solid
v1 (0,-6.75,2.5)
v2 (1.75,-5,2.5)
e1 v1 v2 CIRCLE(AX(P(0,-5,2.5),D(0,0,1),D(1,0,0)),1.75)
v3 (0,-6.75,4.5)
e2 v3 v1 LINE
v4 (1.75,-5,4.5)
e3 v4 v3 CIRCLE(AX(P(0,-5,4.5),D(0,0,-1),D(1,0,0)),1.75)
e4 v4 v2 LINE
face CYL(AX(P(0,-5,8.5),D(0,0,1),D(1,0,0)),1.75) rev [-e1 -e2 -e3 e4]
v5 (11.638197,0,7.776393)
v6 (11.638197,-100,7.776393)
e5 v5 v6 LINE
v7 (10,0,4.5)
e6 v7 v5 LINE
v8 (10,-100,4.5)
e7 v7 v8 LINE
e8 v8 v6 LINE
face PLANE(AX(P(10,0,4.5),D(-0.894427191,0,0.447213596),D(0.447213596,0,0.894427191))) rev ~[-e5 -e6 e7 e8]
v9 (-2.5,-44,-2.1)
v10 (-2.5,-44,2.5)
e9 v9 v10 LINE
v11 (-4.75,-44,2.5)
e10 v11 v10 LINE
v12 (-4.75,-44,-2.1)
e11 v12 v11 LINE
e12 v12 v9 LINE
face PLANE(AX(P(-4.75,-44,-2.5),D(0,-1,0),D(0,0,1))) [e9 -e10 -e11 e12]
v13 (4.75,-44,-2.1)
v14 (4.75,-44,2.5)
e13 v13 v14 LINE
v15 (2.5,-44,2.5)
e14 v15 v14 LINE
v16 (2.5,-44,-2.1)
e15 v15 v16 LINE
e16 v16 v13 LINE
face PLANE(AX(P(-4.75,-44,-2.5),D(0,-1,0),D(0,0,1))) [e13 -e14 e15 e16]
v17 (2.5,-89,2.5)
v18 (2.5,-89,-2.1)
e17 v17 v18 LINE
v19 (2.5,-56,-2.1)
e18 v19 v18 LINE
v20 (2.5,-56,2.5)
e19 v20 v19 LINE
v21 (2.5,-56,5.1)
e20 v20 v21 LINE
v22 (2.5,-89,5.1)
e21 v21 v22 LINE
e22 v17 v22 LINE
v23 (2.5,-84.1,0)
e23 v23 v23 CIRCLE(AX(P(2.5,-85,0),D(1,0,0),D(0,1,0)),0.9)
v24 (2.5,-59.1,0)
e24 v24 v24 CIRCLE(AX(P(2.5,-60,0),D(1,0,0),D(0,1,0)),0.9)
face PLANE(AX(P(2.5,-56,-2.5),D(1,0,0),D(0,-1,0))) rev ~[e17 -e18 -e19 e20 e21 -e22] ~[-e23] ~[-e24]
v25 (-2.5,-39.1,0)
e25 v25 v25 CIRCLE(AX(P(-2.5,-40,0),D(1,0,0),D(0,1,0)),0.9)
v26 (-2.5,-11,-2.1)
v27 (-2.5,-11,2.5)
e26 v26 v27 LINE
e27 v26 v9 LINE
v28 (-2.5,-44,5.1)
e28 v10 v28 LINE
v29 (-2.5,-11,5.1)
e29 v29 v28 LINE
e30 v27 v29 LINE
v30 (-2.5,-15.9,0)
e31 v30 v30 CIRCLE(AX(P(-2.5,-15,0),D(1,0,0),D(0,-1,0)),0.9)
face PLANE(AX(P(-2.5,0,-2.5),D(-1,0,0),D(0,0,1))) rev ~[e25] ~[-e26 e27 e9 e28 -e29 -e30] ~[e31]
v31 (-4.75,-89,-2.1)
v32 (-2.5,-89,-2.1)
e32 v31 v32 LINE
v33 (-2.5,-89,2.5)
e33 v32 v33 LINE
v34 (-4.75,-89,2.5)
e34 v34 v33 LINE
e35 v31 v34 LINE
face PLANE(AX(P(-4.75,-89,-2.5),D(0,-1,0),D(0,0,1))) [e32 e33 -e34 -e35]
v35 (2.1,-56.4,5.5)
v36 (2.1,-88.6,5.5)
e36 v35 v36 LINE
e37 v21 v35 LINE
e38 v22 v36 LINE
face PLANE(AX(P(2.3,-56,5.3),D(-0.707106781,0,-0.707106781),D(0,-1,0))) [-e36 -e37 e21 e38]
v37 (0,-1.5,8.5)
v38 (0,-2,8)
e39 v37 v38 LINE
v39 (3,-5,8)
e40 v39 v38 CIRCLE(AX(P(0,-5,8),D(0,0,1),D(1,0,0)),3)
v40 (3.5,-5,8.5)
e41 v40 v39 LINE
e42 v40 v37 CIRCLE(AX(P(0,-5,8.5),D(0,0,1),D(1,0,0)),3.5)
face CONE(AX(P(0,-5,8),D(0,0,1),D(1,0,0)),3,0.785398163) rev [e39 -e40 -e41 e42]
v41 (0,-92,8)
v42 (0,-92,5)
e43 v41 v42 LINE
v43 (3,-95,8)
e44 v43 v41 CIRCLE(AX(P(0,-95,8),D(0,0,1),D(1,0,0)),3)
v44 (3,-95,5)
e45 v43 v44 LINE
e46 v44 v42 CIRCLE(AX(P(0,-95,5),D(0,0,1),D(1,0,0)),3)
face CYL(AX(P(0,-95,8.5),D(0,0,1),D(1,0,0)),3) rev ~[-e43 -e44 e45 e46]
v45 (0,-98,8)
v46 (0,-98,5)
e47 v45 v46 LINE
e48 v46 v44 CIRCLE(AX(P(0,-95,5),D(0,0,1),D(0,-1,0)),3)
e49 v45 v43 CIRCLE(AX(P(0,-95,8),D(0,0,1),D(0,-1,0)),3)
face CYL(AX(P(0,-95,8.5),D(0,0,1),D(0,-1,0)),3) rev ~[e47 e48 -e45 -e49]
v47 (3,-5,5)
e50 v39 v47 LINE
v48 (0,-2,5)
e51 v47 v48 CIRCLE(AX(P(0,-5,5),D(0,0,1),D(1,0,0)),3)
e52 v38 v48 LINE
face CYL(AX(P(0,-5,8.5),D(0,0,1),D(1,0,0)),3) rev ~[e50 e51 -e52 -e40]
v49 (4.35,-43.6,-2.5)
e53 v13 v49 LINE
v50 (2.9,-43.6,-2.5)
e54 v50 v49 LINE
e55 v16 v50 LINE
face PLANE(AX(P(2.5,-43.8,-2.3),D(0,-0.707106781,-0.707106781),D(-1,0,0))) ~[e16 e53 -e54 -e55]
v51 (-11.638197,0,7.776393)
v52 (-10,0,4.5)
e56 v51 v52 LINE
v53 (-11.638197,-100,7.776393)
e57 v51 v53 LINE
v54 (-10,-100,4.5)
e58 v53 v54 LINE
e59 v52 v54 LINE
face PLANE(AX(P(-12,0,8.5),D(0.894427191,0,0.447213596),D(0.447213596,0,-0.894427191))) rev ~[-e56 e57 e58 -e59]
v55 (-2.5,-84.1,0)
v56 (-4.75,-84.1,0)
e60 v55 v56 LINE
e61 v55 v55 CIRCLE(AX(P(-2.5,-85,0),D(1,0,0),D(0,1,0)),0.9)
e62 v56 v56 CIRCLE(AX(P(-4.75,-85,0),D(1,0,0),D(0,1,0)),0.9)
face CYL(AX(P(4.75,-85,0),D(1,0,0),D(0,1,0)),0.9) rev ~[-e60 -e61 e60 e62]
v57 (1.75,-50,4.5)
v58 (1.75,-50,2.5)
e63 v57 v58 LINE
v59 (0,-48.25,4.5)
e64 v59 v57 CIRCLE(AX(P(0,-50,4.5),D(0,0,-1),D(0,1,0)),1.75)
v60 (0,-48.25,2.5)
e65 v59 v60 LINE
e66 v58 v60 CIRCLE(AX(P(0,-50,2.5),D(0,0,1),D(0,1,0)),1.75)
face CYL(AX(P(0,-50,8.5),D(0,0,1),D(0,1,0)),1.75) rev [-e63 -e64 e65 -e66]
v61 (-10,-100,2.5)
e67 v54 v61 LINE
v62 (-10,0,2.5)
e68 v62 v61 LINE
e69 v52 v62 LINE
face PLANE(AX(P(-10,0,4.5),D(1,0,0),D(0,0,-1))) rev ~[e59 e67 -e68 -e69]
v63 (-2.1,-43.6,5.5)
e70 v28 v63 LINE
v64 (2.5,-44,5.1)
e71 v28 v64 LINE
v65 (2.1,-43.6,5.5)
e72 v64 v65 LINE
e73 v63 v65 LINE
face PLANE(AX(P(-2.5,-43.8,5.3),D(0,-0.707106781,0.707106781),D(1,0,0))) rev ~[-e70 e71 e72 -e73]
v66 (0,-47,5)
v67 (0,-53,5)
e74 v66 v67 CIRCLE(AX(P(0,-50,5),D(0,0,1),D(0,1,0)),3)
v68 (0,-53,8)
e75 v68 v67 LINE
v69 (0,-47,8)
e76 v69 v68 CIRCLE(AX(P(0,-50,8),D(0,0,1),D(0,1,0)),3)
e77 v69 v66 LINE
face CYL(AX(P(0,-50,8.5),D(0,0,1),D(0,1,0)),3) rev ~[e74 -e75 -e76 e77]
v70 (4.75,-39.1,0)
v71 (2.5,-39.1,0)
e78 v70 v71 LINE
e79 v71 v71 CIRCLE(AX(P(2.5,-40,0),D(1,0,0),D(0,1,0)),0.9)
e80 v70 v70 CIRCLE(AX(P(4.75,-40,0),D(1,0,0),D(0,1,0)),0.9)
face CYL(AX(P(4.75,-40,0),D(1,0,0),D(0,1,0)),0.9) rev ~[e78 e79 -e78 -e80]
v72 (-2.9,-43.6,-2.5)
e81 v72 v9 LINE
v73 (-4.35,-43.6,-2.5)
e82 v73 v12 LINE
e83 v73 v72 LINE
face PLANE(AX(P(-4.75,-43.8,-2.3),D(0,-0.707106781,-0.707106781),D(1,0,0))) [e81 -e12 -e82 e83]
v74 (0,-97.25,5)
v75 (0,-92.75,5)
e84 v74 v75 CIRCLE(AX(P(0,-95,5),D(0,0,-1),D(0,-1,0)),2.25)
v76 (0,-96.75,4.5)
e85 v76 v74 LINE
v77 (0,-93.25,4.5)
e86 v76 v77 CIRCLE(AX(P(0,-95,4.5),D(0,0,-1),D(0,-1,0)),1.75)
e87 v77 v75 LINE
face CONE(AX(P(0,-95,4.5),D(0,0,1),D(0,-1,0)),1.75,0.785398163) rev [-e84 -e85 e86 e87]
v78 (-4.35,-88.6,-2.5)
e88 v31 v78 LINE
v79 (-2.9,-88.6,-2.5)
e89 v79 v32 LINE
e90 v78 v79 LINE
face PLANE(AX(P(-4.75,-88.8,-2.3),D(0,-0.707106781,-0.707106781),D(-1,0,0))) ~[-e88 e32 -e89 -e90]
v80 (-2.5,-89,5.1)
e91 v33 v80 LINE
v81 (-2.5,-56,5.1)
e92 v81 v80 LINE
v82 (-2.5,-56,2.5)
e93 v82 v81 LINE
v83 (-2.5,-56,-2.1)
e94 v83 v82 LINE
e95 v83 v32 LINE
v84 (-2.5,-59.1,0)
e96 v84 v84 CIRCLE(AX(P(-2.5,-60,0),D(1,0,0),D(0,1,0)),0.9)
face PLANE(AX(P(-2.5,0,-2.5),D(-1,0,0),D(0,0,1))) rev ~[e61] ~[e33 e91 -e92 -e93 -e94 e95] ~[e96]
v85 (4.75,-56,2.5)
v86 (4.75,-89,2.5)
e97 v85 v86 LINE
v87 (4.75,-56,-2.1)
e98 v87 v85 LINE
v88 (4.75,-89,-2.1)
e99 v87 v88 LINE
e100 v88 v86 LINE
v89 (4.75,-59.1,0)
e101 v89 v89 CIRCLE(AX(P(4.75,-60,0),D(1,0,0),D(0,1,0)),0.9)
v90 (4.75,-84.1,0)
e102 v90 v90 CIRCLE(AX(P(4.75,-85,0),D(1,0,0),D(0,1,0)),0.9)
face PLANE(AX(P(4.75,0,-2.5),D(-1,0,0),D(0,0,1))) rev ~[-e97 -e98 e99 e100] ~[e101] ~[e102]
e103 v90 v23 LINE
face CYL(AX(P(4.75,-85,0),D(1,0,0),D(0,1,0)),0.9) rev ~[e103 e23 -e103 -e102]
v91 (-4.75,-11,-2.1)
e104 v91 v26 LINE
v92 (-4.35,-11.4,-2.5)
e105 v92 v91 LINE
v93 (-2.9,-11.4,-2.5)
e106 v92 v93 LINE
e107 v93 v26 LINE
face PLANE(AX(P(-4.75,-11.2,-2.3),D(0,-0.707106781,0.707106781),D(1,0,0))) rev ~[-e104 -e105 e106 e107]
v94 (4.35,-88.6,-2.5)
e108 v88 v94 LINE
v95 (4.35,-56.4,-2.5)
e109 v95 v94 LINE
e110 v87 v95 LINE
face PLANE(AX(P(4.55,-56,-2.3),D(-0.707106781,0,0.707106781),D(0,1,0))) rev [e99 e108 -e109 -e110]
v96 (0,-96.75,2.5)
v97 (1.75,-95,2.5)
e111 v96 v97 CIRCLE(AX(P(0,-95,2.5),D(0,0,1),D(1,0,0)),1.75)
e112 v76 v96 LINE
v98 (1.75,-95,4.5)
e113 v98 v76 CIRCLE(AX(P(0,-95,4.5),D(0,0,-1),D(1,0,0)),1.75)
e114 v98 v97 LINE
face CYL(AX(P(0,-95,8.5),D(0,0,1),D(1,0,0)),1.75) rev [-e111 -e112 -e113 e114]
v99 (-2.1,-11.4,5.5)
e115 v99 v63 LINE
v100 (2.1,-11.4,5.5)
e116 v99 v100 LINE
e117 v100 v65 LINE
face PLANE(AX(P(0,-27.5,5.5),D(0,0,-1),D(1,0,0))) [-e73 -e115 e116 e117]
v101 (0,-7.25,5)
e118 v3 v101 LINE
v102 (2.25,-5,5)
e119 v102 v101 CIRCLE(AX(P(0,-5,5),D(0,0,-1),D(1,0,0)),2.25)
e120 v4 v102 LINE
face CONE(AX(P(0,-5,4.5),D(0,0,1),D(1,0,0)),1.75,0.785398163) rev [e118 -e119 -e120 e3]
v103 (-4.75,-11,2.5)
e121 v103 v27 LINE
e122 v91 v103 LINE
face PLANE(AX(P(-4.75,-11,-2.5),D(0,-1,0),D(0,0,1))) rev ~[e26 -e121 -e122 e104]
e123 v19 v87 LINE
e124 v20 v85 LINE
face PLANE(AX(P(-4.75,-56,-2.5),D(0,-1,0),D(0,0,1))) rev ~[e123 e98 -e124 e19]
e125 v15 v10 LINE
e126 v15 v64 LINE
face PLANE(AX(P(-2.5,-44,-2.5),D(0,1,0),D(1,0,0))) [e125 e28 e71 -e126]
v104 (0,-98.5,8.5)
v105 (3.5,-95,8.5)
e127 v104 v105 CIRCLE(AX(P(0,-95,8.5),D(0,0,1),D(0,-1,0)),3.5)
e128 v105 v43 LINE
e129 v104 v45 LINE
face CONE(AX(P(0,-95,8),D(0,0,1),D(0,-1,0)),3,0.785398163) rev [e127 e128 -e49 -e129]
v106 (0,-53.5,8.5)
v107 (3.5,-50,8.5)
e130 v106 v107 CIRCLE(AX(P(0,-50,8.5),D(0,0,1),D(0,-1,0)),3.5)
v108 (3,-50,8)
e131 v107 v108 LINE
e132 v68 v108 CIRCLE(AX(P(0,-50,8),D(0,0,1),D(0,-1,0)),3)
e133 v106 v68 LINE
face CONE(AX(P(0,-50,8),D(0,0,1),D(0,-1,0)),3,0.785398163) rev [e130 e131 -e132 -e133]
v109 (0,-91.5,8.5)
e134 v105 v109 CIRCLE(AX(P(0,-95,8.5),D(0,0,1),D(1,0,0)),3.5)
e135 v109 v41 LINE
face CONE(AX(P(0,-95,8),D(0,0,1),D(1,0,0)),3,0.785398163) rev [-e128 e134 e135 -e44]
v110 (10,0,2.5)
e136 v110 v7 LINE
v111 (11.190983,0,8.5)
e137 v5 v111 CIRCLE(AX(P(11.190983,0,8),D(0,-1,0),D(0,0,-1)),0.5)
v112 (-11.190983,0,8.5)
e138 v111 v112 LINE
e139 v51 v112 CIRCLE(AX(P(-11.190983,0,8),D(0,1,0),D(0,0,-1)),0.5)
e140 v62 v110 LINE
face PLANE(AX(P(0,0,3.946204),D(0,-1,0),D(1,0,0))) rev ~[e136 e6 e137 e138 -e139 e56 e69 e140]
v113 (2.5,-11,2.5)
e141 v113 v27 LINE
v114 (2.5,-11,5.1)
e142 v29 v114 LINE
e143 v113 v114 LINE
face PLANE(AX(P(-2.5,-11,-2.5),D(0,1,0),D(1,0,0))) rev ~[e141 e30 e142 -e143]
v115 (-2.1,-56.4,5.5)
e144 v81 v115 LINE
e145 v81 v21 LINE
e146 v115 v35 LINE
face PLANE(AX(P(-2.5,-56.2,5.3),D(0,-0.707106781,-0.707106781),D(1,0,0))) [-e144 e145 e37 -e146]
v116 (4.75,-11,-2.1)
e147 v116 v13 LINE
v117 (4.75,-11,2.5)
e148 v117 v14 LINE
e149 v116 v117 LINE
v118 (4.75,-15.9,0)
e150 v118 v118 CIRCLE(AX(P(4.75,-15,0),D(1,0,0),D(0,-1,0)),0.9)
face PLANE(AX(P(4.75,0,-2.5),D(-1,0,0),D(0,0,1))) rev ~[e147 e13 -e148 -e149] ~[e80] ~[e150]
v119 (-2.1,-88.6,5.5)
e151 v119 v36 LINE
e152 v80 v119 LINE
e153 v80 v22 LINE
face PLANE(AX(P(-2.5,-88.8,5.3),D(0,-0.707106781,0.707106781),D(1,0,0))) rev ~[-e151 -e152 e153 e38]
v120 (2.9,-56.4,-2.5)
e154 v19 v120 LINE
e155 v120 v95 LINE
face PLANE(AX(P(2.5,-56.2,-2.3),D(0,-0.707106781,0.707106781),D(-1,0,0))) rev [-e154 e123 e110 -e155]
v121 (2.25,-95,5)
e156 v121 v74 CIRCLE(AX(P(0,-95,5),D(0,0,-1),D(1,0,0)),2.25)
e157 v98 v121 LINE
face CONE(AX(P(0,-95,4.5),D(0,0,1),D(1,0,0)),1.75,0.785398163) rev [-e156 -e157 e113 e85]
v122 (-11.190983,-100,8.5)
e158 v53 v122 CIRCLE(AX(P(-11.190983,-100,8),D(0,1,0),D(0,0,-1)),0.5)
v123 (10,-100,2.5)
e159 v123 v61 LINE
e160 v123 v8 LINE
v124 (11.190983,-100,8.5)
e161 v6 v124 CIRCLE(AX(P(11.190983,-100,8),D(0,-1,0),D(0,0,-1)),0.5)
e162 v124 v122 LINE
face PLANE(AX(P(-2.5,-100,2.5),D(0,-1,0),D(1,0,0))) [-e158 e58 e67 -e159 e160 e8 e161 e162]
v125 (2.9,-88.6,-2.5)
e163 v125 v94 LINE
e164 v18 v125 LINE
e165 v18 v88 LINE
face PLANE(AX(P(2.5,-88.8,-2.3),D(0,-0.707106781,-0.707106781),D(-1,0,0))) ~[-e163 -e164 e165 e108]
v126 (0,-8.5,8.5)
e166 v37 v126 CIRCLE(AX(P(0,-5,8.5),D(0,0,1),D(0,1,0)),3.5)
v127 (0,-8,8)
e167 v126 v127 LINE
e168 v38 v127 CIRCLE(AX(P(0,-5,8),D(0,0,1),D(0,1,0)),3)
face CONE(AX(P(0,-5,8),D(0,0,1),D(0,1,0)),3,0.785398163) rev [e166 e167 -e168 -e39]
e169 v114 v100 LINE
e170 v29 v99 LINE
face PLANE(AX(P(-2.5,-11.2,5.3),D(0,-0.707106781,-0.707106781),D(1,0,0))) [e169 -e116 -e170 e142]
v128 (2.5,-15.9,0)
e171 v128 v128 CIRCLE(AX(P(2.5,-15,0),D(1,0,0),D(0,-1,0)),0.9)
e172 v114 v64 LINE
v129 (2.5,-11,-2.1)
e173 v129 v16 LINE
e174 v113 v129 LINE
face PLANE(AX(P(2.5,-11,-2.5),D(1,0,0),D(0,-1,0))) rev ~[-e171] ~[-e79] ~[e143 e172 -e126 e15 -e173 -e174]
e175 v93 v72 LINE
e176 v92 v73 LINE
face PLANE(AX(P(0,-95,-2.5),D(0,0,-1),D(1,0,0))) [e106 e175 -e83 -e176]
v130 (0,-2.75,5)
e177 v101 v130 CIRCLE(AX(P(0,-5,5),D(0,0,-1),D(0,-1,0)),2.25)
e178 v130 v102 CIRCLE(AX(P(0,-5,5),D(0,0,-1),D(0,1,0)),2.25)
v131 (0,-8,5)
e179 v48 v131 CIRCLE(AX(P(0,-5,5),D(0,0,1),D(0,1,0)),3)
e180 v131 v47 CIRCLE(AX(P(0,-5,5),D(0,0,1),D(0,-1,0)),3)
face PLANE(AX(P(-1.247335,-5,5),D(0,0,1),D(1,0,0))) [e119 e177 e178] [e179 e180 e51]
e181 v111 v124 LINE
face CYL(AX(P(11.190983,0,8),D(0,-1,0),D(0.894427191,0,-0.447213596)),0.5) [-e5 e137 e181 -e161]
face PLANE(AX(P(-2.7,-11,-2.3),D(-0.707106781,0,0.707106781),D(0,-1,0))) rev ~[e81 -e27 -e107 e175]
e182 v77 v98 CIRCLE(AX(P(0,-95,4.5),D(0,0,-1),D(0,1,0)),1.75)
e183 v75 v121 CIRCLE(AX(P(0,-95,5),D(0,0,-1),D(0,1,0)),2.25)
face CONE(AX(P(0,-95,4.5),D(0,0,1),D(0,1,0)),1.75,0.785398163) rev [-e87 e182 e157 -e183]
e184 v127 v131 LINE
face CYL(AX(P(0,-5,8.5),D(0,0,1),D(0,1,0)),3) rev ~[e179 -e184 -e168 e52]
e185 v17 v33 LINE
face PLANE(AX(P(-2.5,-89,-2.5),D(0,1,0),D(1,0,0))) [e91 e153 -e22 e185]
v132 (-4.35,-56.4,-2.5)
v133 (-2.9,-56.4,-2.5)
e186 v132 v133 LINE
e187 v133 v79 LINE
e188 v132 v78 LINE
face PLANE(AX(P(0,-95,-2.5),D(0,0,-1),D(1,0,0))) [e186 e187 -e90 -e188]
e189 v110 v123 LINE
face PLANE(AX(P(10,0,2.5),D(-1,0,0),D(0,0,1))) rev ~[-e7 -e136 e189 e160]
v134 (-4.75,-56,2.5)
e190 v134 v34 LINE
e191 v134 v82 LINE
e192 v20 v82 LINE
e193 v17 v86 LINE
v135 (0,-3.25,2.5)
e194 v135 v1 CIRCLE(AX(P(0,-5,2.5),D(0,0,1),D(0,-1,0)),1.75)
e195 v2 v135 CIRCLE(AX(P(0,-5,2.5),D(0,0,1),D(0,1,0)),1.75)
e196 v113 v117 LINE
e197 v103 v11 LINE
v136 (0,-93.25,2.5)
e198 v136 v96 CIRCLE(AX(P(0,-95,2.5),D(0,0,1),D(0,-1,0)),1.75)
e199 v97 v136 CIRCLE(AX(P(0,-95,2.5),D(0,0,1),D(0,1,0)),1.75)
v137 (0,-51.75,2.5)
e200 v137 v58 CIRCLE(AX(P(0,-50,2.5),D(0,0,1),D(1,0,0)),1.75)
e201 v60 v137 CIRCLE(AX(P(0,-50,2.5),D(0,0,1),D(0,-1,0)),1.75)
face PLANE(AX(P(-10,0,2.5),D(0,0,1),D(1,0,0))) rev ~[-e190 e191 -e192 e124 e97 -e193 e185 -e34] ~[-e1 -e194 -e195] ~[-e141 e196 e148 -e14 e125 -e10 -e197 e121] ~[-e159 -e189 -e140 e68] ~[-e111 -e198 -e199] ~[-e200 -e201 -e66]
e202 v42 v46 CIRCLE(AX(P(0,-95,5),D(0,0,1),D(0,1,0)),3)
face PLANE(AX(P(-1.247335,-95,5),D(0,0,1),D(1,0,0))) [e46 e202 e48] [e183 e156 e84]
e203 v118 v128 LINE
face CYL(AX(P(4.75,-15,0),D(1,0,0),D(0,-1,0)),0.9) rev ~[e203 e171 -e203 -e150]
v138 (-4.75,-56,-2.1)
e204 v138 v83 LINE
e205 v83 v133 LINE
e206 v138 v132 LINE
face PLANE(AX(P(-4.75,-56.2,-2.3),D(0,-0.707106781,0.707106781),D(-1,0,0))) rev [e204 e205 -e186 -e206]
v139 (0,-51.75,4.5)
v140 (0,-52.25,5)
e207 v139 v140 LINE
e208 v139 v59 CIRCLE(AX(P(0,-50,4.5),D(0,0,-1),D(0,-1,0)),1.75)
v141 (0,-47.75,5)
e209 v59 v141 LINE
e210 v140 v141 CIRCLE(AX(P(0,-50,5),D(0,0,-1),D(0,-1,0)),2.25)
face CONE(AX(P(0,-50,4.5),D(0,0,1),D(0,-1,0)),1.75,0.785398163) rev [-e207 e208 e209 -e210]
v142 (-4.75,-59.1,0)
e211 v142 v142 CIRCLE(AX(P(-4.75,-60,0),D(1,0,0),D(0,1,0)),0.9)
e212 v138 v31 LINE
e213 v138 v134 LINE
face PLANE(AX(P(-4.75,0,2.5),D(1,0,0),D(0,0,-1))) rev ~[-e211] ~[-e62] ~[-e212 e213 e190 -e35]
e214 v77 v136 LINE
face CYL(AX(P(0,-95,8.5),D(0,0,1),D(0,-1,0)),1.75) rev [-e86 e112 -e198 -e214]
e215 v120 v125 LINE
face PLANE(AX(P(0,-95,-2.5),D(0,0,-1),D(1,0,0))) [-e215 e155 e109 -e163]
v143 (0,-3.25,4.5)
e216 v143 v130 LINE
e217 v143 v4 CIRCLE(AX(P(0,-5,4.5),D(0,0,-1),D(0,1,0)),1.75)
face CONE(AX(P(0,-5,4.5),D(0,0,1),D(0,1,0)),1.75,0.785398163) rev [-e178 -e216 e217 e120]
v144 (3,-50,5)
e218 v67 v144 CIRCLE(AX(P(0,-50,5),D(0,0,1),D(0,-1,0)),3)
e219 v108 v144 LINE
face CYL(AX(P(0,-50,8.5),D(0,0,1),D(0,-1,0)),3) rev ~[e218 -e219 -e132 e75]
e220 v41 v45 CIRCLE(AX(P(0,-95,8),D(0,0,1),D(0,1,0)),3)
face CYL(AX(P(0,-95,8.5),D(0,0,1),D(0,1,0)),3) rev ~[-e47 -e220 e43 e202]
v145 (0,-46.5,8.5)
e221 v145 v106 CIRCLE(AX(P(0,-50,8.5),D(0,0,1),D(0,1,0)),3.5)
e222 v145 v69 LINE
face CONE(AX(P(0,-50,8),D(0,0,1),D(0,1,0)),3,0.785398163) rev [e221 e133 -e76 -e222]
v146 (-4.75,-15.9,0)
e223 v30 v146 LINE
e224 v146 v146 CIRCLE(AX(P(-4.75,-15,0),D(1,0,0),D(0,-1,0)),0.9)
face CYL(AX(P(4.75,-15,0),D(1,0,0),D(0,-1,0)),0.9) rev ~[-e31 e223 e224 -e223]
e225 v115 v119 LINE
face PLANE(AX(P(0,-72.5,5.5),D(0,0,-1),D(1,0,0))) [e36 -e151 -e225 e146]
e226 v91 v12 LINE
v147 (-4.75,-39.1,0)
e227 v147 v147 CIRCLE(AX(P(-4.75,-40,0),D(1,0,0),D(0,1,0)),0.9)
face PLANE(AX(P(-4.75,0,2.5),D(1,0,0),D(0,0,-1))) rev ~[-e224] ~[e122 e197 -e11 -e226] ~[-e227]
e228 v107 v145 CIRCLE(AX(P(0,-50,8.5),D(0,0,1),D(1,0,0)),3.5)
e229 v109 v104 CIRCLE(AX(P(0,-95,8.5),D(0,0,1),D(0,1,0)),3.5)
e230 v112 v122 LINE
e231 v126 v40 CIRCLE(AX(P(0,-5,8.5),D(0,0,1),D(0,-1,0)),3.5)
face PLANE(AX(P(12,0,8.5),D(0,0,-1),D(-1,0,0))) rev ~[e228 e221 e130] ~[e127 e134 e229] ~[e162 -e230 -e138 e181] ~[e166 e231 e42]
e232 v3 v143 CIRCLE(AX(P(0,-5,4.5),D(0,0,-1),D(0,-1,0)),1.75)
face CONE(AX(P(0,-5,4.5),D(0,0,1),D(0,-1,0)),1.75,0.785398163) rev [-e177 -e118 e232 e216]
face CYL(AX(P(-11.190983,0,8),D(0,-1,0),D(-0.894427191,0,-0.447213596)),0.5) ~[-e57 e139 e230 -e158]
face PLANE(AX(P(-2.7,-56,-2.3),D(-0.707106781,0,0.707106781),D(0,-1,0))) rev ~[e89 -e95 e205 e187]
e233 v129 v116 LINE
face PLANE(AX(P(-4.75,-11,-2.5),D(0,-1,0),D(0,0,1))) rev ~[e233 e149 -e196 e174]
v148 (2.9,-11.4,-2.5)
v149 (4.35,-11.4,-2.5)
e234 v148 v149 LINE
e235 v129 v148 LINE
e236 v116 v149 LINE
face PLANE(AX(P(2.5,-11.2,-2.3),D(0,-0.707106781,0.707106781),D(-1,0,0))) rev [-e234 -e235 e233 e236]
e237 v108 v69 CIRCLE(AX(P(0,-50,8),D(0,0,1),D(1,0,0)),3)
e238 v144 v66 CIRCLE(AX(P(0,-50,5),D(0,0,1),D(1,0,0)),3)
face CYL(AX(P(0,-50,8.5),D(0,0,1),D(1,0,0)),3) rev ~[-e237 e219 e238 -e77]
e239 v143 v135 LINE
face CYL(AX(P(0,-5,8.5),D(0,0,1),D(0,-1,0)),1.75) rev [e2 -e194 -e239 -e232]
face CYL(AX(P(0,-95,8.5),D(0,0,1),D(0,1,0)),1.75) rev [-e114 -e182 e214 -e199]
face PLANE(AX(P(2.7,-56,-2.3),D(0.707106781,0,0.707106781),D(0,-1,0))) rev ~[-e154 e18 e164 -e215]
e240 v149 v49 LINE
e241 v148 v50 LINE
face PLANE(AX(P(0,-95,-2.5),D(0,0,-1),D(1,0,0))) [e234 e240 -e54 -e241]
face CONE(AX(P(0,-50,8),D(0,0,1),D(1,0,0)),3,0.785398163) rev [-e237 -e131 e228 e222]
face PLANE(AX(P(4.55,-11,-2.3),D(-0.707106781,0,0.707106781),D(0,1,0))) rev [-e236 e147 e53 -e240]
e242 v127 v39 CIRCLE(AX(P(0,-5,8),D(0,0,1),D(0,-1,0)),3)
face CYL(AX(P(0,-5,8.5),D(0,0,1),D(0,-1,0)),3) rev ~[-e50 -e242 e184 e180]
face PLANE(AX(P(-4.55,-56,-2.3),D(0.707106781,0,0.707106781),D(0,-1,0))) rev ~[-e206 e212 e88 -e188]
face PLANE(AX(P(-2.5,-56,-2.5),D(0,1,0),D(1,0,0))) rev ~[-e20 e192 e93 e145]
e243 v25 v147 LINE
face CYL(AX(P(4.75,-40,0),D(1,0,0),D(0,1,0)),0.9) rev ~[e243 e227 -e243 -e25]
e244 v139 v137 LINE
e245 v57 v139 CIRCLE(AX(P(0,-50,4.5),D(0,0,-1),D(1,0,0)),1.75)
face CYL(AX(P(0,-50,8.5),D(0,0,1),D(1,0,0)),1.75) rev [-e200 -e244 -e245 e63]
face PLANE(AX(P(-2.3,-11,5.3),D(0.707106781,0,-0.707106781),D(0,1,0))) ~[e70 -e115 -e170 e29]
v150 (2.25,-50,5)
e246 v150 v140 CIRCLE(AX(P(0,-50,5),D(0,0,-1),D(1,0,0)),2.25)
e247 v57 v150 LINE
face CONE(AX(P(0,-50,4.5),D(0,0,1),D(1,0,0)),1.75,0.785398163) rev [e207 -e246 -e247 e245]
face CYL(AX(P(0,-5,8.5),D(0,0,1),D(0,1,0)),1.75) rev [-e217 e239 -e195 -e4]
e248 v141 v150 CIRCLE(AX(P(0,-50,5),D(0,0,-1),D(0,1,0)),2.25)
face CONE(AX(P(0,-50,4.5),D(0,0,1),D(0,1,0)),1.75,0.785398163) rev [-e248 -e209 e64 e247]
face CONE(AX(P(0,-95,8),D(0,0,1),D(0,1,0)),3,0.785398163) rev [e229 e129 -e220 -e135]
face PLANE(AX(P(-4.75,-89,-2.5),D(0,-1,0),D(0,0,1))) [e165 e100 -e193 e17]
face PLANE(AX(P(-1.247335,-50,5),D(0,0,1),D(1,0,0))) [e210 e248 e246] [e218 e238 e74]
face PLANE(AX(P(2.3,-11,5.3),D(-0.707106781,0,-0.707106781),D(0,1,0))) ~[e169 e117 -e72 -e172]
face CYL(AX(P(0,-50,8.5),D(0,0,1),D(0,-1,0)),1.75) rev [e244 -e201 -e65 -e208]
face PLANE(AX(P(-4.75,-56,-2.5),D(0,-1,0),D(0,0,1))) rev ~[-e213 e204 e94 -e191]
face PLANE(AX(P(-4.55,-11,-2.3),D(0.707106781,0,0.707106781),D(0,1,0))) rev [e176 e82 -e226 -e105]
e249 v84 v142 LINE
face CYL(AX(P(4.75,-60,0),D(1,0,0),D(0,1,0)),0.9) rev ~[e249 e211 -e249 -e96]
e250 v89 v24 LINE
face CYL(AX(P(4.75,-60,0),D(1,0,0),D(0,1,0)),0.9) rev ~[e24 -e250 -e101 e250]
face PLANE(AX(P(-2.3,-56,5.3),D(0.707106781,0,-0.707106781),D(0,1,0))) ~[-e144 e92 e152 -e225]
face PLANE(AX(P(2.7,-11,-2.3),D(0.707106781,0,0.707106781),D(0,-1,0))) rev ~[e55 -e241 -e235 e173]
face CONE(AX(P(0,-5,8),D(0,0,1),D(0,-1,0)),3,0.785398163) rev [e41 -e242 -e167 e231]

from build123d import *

# Parameters (mm, degrees)
F1_DEPTH  = 100
F2_W      = 5
F2_H      = 10
F3_DEPTH  = 5
F4_R      = 0.9
F5_DEPTH  = 25
F7_DEPTH  = 3.5
F8_DEPTH  = 11.001
F9_SIZE   = 0.5
F10_W     = 11
F10_H     = 5
F10_W_2   = 12
F11_DEPTH = 25
F12_W     = 5
F12_H     = 33
F13_DEPTH = 8
F14_W     = 5
F14_H     = 33
F15_DEPTH = 8
F16_SIZE  = 0.4
F17_R     = 0.5


with BuildPart() as f1:
    # F0 (on Front) → F1 (new body)
    with BuildSketch(Plane.XZ):
        Polygon((2.5, -2.5), (4.75, -2.5), (4.75, 2.5), (10, 2.5), (10, 4.5), (12, 8.5), (10, 8.5), (6, 8.5), (-6, 8.5), (-10, 8.5), (-12, 8.5), (-10, 4.5), (-10, 2.5), (-4.75, 2.5), (-4.75, -2.5), (-2.5, -2.5), (-2.5, 2.5), (2.5, 2.5), align=None)
    extrude(amount=F1_DEPTH)

    # F2 (on face) → F3 (join)
    with BuildSketch(Plane(origin=(0, 0, 2.5), x_dir=(1, 0, 0), z_dir=(0, 0, -1))):
        with Locations((0, 95)):
            Rectangle(F2_W, F2_H)
        Polygon((-2.5, 50), (-2.5, 45), (2.5, 45), (2.5, 50), (2.5, 55), (-2.5, 55), align=None)
        with Locations((0, 5)):
            Rectangle(F2_W, F2_H)
    extrude(amount=F3_DEPTH)

    # F4 (on face) → F5 (cut)
    with BuildSketch(Plane.YZ.offset(4.75)):
        with Locations((-85, 0)):
            Circle(F4_R)
        with Locations((-40, 0)):
            Circle(F4_R)
        with BuildLine():
            ThreePointArc((-14.1, 0), (-15, 0.9), (-15.9, 0))
            Line((-15.9, 0), (-14.1, 0))
        make_face()
        with BuildLine():
            Line((-14.1, 0), (-15.9, 0))
            ThreePointArc((-15.9, 0), (-15, -0.9), (-14.1, 0))
        make_face()
        with Locations((-60, 0)):
            Circle(F4_R)
    extrude(amount=-F5_DEPTH, mode=Mode.SUBTRACT)

    # F6 (on face) → F7 (cut)
    with BuildSketch(Plane.XY.offset(8.5)):
        with BuildLine():
            ThreePointArc((0, -92), (-3, -95), (0, -98))
            Line((0, -98), (0, -96.75))
            ThreePointArc((0, -96.75), (-1.75, -95), (0, -93.25))
            Line((0, -93.25), (0, -92))
        make_face()
        with BuildLine():
            ThreePointArc((0, -2), (-3, -5), (0, -8))
            Line((0, -8), (0, -6.75))
            ThreePointArc((0, -6.75), (-1.75, -5), (0, -3.25))
            Line((0, -3.25), (0, -2))
        make_face()
        with BuildLine():
            Line((0, -6.75), (0, -8))
            ThreePointArc((0, -8), (2.1213203436, -7.1213203436), (3, -5))
            ThreePointArc((3, -5), (2.1213203436, -2.8786796564), (0, -2))
            Line((0, -2), (0, -3.25))
            ThreePointArc((0, -3.25), (1.2374368671, -3.7625631329), (1.75, -5))
            ThreePointArc((1.75, -5), (1.2374368671, -6.2374368671), (0, -6.75))
        make_face()
        with BuildLine():
            ThreePointArc((0, -47), (-3, -50), (0, -53))
            Line((0, -53), (0, -51.75))
            ThreePointArc((0, -51.75), (-1.75, -50), (0, -48.25))
            Line((0, -48.25), (0, -47))
        make_face()
        with BuildLine():
            Line((0, -51.75), (0, -53))
            ThreePointArc((0, -53), (2.1213203436, -52.1213203436), (3, -50))
            ThreePointArc((3, -50), (2.1213203436, -47.8786796564), (0, -47))
            Line((0, -47), (0, -48.25))
            ThreePointArc((0, -48.25), (1.2374368671, -48.7625631329), (1.75, -50))
            ThreePointArc((1.75, -50), (1.2374368671, -51.2374368671), (0, -51.75))
        make_face()
        with BuildLine():
            Line((0, -96.75), (0, -98))
            ThreePointArc((0, -98), (2.1213203436, -97.1213203436), (3, -95))
            ThreePointArc((3, -95), (2.1213203436, -92.8786796564), (0, -92))
            Line((0, -92), (0, -93.25))
            ThreePointArc((0, -93.25), (1.2374368671, -93.7625631329), (1.75, -95))
            ThreePointArc((1.75, -95), (1.2374368671, -96.2374368671), (0, -96.75))
        make_face()
    extrude(amount=-F7_DEPTH, mode=Mode.SUBTRACT)

    # F8 (cut, through all): faces of the model
    f8_faces = [f1.faces().sort_by_distance(p)[0] for p in [
        (0, -5, 8.5),
        (0, -50, 8.5),
        (0, -95, 8.5),
    ]]
    extrude(f8_faces, amount=-F8_DEPTH, mode=Mode.SUBTRACT)

    # F9
    f9_edges = [f1.edges().sort_by_distance(p)[0] for p in [
        (0, -2, 8.5),
        (0, -47, 8.5),
        (0, -92, 8.5),
        (0, -6.75, 5),
        (0, -51.75, 5),
        (0, -96.75, 5),
        (0, -96.75, -2.5),
        (0, -51.75, -2.5),
        (0, -6.75, -2.5),
    ]]
    chamfer(f9_edges, length=F9_SIZE)

    # F10 (on face) → F11 (cut)
    with BuildSketch(Plane(origin=(-4.75, 0, 0), x_dir=(0, -1, 0), z_dir=(-1, 0, 0))):
        with Locations((5.5, 0)):
            Rectangle(F10_W, F10_H)
        with Locations((50, 0)):
            Rectangle(F10_W_2, F10_H)
        with Locations((94.5, 0)):
            Rectangle(F10_W, F10_H)
    extrude(amount=-F11_DEPTH, mode=Mode.SUBTRACT)

    # F12 (on face) → F13 (cut)
    with BuildSketch(Plane(origin=(0, 0, -2.5), x_dir=(1, 0, 0), z_dir=(0, 0, -1))):
        with Locations((0, 72.5)):
            Rectangle(F12_W, F12_H)
    extrude(amount=-F13_DEPTH, mode=Mode.SUBTRACT)

    # F14 (on face) → F15 (cut)
    with BuildSketch(Plane(origin=(0, 0, -2.5), x_dir=(1, 0, 0), z_dir=(0, 0, -1))):
        with Locations((0, 27.5)):
            Rectangle(F14_W, F14_H)
    extrude(amount=-F15_DEPTH, mode=Mode.SUBTRACT)

    # F16
    f16_edges = [f1.edges().sort_by_distance(p)[0] for p in [
        (-3.625, -11, -2.5),
        (-2.5, -27.5, -2.5),
        (-3.625, -44, -2.5),
        (-4.75, -27.5, -2.5),
        (4.75, -27.5, -2.5),
        (3.625, -44, -2.5),
        (2.5, -27.5, -2.5),
        (3.625, -11, -2.5),
        (4.75, -72.5, -2.5),
        (3.625, -89, -2.5),
        (2.5, -72.5, -2.5),
        (3.625, -56, -2.5),
        (-3.625, -56, -2.5),
        (-2.5, -72.5, -2.5),
        (-3.625, -89, -2.5),
        (-4.75, -72.5, -2.5),
        (0, -44, 5.5),
        (-2.5, -27.5, 5.5),
        (0, -11, 5.5),
        (2.5, -27.5, 5.5),
        (0, -89, 5.5),
        (-2.5, -72.5, 5.5),
        (0, -56, 5.5),
        (2.5, -72.5, 5.5),
    ]]
    chamfer(f16_edges, length=F16_SIZE)

    # F17
    f17_edges = [f1.edges().sort_by_distance(p)[0] for p in [
        (12, -50, 8.5),
        (-12, -50, 8.5),
    ]]
    fillet(f17_edges, radius=F17_R)


solid = f1.part
